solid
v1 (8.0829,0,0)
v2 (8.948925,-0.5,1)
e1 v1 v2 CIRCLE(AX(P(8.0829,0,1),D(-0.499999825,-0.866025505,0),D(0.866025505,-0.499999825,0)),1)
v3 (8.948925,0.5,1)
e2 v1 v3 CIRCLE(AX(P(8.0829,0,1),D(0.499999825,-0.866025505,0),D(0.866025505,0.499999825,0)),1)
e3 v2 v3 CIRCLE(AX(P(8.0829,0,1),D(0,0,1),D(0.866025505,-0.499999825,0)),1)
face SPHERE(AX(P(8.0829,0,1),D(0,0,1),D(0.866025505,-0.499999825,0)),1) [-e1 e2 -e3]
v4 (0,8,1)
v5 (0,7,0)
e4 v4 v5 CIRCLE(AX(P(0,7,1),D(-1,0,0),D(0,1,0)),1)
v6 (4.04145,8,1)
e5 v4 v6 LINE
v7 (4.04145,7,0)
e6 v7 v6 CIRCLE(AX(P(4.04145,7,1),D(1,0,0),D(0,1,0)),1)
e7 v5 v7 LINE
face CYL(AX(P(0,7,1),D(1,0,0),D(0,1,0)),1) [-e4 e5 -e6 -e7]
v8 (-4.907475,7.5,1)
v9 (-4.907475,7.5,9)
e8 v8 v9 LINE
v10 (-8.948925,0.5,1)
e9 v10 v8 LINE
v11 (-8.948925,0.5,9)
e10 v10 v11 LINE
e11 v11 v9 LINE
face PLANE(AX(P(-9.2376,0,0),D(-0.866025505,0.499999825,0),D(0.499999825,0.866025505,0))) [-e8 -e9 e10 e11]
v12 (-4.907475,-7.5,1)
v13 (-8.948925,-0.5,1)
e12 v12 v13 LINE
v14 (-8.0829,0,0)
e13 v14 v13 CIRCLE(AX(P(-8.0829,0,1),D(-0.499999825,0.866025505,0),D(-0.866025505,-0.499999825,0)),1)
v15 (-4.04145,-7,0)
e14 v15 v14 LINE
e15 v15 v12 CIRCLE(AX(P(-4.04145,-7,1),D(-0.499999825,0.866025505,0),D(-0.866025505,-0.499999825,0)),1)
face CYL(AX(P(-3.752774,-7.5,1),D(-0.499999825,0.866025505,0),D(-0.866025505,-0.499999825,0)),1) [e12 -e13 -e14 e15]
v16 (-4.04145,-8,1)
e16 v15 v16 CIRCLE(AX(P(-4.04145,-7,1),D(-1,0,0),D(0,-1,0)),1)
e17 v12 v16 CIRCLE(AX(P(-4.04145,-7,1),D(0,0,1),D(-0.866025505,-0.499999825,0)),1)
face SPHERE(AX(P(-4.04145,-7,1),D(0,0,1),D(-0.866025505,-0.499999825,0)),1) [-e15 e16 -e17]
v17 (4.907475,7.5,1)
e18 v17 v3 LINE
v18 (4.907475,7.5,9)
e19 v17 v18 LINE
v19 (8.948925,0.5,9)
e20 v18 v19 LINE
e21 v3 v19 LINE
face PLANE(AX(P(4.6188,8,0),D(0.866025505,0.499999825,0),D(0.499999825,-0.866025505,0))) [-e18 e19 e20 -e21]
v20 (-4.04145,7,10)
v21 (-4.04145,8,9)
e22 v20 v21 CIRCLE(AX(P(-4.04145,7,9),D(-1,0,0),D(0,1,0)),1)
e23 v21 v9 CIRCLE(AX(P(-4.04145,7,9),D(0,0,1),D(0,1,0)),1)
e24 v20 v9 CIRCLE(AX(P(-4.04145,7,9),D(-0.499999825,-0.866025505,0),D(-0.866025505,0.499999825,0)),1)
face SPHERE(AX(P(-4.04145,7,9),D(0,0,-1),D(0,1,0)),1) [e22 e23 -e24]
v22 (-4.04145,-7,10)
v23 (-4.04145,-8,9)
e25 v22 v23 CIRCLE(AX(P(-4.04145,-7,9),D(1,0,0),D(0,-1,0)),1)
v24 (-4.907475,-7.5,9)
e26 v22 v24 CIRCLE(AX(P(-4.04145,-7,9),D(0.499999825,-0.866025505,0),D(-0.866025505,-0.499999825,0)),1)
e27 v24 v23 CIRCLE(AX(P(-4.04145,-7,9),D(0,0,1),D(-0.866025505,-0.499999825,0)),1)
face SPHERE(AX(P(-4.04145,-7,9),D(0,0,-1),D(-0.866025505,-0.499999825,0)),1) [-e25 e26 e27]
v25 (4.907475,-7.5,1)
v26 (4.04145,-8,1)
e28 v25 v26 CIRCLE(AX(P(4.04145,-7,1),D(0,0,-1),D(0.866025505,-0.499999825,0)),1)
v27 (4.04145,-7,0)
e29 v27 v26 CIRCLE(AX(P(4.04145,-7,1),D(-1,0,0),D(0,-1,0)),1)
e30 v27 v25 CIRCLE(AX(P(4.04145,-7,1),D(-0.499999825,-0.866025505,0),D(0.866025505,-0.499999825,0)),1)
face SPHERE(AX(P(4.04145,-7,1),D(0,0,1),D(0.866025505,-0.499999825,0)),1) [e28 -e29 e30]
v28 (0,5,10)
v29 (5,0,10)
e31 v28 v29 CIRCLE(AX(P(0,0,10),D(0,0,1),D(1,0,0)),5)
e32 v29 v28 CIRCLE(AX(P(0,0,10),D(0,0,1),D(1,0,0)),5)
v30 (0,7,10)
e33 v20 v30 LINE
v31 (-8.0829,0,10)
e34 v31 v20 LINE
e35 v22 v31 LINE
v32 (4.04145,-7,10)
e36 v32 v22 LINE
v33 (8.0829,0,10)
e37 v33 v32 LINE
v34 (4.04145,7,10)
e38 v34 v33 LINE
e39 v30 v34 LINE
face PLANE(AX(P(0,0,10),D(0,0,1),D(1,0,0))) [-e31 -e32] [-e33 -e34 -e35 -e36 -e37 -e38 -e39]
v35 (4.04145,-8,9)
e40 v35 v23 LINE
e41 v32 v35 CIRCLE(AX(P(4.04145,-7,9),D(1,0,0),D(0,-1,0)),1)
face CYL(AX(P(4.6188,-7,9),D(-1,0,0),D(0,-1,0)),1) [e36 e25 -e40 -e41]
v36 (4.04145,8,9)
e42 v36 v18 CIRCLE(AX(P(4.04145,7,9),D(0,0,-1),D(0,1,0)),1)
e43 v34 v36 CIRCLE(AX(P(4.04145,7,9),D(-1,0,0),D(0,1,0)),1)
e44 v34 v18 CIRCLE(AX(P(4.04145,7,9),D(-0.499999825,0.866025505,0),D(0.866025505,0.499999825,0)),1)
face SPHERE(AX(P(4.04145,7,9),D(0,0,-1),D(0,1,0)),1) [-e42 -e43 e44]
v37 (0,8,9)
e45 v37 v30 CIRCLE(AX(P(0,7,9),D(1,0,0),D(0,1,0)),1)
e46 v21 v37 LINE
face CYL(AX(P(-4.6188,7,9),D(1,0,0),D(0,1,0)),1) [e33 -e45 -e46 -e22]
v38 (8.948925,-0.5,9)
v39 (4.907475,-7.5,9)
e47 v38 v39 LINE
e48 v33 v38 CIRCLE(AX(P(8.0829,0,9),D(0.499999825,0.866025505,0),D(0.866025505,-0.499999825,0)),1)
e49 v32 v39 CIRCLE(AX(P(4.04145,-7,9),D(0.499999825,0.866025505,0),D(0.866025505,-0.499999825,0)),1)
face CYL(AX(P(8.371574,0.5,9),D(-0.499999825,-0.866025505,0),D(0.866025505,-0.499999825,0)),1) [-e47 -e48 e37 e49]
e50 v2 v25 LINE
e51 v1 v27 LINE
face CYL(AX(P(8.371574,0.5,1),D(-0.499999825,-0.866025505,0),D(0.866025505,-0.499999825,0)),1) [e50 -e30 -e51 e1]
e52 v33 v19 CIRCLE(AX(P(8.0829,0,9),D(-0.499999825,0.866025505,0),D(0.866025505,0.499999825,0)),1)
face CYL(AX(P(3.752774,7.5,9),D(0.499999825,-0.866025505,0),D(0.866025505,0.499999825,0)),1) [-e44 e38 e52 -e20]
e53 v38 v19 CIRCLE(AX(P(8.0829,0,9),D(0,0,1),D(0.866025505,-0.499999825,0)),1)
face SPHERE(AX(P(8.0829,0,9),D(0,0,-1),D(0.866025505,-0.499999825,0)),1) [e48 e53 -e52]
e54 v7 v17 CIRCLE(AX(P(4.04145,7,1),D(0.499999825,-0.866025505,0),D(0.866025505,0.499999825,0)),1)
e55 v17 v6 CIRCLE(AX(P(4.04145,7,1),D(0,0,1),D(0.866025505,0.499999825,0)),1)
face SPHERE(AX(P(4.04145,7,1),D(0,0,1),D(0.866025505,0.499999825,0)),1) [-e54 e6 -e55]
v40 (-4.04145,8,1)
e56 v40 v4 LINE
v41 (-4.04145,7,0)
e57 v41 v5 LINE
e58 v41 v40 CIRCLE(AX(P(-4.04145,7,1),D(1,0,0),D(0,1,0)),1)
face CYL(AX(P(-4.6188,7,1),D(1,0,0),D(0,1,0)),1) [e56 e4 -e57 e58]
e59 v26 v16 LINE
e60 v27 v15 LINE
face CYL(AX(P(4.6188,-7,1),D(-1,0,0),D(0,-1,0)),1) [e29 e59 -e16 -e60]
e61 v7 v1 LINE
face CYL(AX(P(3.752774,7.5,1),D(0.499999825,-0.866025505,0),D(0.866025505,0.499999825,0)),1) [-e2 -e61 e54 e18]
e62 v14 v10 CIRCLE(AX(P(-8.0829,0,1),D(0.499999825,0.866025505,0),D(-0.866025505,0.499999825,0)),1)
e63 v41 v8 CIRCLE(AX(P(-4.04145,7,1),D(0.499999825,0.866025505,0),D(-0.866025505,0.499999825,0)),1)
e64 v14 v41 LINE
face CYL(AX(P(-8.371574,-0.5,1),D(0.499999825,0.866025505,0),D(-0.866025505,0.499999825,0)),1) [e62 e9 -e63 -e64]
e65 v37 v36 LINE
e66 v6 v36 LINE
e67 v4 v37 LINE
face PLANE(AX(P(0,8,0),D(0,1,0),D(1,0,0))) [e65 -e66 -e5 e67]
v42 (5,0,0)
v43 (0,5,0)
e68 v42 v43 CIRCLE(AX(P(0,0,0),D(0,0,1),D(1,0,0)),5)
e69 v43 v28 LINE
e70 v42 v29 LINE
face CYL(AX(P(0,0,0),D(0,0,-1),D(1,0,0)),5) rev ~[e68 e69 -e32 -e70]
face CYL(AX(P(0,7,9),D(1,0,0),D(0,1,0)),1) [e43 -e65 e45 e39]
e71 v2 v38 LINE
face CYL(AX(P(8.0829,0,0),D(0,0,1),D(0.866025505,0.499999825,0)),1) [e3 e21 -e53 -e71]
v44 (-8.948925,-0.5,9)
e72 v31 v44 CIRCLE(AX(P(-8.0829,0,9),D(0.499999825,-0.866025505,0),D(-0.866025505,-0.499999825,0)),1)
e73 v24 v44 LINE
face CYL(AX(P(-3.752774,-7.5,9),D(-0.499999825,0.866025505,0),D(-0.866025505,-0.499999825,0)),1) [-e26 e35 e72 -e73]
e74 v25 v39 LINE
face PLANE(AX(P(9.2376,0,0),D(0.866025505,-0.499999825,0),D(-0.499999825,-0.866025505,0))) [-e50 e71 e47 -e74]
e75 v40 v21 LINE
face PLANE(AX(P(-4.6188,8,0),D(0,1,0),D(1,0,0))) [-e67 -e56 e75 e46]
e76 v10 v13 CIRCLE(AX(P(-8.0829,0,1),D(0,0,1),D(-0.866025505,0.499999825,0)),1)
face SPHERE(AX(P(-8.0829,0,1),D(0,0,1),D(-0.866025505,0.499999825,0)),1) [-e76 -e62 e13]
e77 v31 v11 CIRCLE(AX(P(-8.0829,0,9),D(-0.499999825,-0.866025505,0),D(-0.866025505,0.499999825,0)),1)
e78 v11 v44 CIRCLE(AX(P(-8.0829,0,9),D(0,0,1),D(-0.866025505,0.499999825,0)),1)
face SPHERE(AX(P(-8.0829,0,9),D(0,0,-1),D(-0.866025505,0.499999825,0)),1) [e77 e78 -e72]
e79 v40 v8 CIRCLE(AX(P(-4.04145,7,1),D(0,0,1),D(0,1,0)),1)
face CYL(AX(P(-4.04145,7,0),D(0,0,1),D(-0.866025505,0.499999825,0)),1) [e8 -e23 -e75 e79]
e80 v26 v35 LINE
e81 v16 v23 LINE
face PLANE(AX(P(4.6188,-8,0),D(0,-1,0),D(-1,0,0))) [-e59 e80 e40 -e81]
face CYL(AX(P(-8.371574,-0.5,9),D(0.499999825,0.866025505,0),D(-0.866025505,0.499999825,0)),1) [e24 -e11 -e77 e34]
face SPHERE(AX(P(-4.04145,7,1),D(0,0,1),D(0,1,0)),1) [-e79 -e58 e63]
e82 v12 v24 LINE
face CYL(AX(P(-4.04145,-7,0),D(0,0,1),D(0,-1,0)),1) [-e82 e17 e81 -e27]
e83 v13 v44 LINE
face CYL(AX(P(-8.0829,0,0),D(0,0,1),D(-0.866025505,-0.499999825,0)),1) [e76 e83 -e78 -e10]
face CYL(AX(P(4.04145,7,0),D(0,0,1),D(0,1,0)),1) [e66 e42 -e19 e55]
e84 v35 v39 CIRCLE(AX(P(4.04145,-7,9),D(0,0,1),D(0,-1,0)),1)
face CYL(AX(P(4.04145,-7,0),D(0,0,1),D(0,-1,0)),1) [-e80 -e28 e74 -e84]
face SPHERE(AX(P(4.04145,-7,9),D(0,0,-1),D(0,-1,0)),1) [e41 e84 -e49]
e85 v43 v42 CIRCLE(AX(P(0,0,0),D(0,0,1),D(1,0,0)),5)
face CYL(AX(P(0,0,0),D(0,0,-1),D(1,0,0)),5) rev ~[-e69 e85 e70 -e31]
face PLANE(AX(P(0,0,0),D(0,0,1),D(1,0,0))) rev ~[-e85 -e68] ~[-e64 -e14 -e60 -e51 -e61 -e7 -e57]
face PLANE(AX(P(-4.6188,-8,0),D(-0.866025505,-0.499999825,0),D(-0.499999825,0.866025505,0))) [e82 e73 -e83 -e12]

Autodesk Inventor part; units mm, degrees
ref_plane "YZ Plane" through (0, 0, 0) normal (1, 0, 0) x (0, 1, 0)
ref_plane "XZ Plane" through (0, 0, 0) normal (0, 1, 0) x (-1, 0, 0)
ref_plane "XY Plane" through (0, 0, 0) normal (0, 0, 1) x (1, 0, 0)
sketch "草图1" plane through (0, 0, 0) normal (0, 0, 1) x (1, 0, 0)
  line L0 (4.6188, -8) -> (-4.6188, -8)
  line L1 (-4.6188, -8) -> (-9.2376, 0)
  line L2 (-9.2376, 0) -> (-4.6188, 8)
  line L3 (-4.6188, 8) -> (4.6188, 8)
  line L4 (4.6188, 8) -> (9.2376, 0)
  line L5 (9.2376, 0) -> (4.6188, -8)
  line L6 (0, 0) -> (0, 8)
  circle A0 centre (0, 0) radius 5
  dimension "d0" = 16
  dimension "d1" = 10
extrude "拉伸1" add sketch "草图1" along normal blind 10
thread "螺纹1" size "M10x1.5" class "6H" standard "ANSI Metric M Profile" full length
fillet "圆角1" radius 1 20 edges at (2.3094, 8, 10) (-2.3094, 8, 10) (-6.9282, 4, 10) (-6.9282, -4, 10) (0, -8, 10) (6.9282, -4, 10) (6.9282, 4, 10) (9.2376, 0, 5) (4.6188, 8, 5) (-4.6188, 8, 5) (-9.2376, 0, 5) (-4.6188, -8, 5) (4.6188, -8, 5) (6.9282, -4, 0) (6.9282, 4, 0) (2.3094, 8, 0) (-2.3094, 8, 0) (-6.9282, 4, 0) (-6.9282, -4, 0) (0, -8, 0)
properties part number "集肉斗固定螺帽"
